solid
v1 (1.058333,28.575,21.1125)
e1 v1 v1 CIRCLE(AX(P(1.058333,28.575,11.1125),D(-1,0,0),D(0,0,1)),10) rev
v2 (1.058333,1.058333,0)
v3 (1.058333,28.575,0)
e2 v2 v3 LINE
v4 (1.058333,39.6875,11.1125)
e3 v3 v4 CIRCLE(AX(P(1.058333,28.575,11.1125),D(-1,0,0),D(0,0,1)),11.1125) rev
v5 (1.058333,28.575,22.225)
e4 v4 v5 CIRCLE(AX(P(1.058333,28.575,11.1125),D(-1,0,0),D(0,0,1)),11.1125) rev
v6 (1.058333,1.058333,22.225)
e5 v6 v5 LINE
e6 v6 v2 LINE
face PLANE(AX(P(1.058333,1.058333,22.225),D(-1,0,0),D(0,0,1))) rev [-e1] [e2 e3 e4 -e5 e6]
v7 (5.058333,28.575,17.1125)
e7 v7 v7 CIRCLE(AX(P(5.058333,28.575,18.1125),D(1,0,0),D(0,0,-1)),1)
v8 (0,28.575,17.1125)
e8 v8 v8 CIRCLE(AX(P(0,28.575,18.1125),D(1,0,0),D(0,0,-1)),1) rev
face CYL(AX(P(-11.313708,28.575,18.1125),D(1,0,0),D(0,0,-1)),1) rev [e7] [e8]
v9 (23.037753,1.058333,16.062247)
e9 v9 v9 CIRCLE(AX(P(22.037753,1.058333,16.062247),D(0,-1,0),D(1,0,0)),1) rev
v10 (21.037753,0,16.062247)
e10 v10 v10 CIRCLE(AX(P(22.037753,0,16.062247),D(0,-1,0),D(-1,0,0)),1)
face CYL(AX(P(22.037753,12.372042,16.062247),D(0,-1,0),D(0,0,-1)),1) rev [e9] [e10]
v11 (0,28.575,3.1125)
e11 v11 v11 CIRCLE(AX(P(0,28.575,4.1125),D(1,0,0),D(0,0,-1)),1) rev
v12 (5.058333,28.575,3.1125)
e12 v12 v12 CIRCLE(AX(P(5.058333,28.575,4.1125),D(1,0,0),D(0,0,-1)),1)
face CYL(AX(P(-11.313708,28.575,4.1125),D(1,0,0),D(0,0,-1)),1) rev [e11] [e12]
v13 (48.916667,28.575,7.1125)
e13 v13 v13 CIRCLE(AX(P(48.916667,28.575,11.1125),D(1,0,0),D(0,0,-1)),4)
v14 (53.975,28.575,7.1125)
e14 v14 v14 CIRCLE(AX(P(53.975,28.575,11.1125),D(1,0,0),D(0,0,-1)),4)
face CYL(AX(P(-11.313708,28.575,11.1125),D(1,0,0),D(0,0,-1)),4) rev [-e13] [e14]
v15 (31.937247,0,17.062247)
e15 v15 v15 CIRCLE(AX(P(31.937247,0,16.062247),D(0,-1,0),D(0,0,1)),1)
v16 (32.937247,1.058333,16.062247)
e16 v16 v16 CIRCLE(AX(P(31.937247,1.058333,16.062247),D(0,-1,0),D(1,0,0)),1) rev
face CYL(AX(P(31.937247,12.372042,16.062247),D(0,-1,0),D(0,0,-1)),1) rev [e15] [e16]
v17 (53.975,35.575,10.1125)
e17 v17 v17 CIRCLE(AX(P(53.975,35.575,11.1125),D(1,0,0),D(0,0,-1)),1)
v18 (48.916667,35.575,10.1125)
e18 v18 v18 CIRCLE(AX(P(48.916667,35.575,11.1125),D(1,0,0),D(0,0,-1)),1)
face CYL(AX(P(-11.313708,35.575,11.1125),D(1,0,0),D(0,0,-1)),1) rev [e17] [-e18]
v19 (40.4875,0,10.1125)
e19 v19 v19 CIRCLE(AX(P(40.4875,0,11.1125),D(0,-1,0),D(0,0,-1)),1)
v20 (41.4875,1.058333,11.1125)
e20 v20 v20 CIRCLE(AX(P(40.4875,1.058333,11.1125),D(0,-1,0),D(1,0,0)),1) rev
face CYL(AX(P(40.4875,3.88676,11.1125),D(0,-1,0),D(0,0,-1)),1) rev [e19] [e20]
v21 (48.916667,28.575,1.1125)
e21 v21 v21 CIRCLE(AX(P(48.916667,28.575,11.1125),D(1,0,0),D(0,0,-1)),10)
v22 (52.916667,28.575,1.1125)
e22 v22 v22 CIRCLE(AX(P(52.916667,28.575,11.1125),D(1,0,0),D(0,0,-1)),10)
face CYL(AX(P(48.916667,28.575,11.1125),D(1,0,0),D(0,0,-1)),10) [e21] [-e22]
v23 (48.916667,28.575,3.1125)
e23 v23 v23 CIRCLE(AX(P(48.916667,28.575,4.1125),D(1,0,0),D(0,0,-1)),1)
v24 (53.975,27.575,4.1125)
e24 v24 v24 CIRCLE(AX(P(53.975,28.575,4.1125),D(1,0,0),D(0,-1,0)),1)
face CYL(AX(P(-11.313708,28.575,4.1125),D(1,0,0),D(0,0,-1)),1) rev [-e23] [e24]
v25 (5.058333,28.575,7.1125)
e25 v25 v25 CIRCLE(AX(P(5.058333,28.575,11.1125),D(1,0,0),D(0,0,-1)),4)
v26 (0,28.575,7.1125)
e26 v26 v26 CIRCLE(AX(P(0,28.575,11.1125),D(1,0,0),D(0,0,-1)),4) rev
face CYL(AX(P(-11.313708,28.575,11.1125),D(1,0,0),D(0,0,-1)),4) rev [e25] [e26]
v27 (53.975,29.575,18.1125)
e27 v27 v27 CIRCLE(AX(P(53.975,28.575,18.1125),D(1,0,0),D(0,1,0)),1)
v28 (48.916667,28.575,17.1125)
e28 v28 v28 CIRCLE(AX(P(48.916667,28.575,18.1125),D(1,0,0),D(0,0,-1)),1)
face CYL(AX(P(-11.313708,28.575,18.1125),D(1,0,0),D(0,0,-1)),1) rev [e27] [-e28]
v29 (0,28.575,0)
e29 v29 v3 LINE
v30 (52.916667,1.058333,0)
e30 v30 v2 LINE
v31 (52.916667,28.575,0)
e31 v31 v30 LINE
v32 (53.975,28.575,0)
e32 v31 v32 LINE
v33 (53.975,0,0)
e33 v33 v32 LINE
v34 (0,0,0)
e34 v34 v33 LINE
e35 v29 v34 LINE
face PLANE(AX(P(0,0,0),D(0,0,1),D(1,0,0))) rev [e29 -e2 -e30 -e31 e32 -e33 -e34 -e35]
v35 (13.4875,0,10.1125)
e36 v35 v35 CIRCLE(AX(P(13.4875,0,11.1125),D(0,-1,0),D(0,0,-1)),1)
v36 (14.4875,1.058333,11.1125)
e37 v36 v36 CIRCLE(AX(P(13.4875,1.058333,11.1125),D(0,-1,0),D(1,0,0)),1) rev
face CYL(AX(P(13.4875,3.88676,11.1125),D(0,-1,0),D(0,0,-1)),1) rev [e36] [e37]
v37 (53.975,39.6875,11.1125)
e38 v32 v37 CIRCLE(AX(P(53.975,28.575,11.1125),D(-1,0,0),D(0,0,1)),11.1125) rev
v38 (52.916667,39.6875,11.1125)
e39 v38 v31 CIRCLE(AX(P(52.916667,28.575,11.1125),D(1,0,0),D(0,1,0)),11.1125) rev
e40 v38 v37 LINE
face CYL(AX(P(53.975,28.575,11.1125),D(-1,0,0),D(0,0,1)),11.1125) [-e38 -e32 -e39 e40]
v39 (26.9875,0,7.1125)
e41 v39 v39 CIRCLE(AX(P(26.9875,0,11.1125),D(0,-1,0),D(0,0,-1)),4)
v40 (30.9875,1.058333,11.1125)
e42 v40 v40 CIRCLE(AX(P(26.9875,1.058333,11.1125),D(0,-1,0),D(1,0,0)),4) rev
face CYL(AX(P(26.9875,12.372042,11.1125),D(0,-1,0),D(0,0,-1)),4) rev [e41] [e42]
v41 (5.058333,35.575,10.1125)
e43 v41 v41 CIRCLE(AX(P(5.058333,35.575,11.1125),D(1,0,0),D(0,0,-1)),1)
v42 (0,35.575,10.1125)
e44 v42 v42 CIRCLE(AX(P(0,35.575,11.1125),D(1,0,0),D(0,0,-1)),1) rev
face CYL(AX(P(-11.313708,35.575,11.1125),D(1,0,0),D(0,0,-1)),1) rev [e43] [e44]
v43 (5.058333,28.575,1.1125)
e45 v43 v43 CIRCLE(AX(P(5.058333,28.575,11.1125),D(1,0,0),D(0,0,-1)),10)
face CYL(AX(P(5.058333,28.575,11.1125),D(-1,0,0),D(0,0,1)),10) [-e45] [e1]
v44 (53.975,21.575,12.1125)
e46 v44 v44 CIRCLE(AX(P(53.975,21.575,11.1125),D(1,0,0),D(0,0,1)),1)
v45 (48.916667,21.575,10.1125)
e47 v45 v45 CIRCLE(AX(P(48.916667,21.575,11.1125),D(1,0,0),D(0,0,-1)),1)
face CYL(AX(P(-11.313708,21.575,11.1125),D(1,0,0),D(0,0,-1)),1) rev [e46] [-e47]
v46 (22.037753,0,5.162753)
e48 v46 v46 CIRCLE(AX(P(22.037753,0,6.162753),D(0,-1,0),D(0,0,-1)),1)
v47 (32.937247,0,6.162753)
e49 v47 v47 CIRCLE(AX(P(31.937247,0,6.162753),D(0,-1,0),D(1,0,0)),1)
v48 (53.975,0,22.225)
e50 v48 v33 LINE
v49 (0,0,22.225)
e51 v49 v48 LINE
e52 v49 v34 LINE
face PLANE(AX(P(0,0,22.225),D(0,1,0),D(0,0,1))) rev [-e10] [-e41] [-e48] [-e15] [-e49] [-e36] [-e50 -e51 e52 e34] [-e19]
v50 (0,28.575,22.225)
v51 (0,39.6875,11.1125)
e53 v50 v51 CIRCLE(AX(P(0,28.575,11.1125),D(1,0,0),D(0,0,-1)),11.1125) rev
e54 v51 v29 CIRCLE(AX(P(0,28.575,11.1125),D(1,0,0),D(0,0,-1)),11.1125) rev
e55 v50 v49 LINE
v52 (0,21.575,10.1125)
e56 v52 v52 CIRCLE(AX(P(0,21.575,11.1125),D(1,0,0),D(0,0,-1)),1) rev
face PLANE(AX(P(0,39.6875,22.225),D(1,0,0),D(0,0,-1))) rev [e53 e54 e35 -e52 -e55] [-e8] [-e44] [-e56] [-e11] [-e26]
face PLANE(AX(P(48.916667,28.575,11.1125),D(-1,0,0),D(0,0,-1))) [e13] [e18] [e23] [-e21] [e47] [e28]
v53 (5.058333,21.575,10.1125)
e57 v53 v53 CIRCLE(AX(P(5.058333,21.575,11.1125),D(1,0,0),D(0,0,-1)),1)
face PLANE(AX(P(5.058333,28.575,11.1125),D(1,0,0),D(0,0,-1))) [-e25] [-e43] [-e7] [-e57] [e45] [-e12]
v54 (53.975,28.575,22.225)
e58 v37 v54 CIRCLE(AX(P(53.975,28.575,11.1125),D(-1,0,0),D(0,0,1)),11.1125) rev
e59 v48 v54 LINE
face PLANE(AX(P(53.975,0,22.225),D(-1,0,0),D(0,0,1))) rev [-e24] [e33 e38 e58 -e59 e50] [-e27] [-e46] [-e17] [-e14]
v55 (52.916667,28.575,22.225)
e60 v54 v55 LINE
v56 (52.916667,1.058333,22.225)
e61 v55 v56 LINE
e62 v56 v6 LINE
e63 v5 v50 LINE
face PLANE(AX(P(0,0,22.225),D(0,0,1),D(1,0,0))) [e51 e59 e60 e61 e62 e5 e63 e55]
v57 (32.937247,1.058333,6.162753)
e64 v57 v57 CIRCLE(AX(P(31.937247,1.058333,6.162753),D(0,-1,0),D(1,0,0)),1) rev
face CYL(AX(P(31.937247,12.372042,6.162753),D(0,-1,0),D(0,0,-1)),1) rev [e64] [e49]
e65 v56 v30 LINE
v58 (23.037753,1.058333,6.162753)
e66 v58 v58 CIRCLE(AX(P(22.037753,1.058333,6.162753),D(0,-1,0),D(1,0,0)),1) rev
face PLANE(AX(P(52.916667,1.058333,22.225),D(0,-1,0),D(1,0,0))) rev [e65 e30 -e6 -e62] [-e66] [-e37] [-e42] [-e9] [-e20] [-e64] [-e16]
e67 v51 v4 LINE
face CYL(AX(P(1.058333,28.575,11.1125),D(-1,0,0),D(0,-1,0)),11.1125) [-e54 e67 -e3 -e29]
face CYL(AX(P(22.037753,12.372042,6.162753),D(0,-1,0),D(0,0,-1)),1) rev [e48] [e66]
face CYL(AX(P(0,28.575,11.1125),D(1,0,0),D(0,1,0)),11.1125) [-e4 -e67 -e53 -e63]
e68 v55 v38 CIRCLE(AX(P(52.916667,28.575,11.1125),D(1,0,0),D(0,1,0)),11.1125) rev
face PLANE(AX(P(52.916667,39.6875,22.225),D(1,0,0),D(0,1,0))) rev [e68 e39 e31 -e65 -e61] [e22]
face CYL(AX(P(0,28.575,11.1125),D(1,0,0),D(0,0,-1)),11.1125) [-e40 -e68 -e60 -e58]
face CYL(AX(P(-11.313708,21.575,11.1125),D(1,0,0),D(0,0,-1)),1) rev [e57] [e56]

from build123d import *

# Parameters (mm, degrees)
BOSS_EXTRUDE1_DEPTH = 22.225
FILLET1_R           = 11.1125
CUT_EXTRUDE1_REACH  = 72.586
SKETCH4_R           = 4
SKETCH4_R_2         = 1
CIRPATTERN1_COUNT   = 4
SKETCH5_R           = 4
SKETCH5_R_2         = 1
CUT_EXTRUDE2_DEPTH  = 1.058333333
CIRPATTERN2_COUNT   = 4
SKETCH6_R           = 1
CUT_EXTRUDE3_DEPTH  = 1.058333333
BOSS_EXTRUDE2_START = 4
SKETCH7_R           = 10
SKETCH7_R_2         = 1
SKETCH7_R_3         = 4
BOSS_EXTRUDE2_DEPTH = 4


with BuildPart() as part:
    # Sketch2 → Boss-Extrude1 (new body)
    with BuildSketch(Plane.XY):
        Polygon((0, 39.6875), (0, 0), (53.975, 0), (53.975, 39.6875), (52.916666667, 39.6875), (52.916666667, 1.058333333), (1.058333333, 1.058333333), (1.058333333, 39.6875), align=None)
    extrude(amount=BOSS_EXTRUDE1_DEPTH)

    # Fillet1
    fillet1_edges = [part.edges().sort_by_distance(p)[0] for p in [
        (0.529166667, 39.6875, 0),
        (0.529166667, 39.6875, 22.225),
        (53.445833333, 39.6875, 0),
        (53.445833333, 39.6875, 22.225),
    ]]
    fillet(fillet1_edges, radius=FILLET1_R - 0.0001)  # a hair under: the kernel refuses the full size

    # Cut-Extrude1: up to this face of the body (flat: up to its plane)
    cut_extrude1_end = Plane(part.part.faces().sort_by_distance((0, 18.733844913, 11.1125))[0])
    # Sketch4 → Cut-Extrude1 (cut, up to the picked face)
    with BuildSketch(Plane(origin=(53.975, 0, 0), x_dir=(0, 0, -1), z_dir=(1, 0, 0)), mode=Mode.PRIVATE) as cut_extrude1_sk1:
        with Locations((-11.1125, 28.575)):
            Circle(SKETCH4_R)
    cut_extrude1_tool1 = split(extrude(cut_extrude1_sk1.sketch, amount=-CUT_EXTRUDE1_REACH, mode=Mode.PRIVATE), bisect_by=cut_extrude1_end, keep=Keep.BOTH, mode=Mode.PRIVATE)
    # Sketch4 → Cut-Extrude1 (cut, up to the picked face)
    with BuildSketch(Plane(origin=(53.975, 0, 0), x_dir=(0, 0, -1), z_dir=(1, 0, 0)), mode=Mode.PRIVATE) as cut_extrude1_sk2:
        with Locations((-11.1125, 35.575)):
            Circle(SKETCH4_R_2)
    cut_extrude1_tool2 = split(extrude(cut_extrude1_sk2.sketch, amount=-CUT_EXTRUDE1_REACH, mode=Mode.PRIVATE), bisect_by=cut_extrude1_end, keep=Keep.BOTH, mode=Mode.PRIVATE)
    cut_extrude1_1 = cut_extrude1_tool1.solids().sort_by(Axis((53.975, 28.575, 11.1125), (-1, 0, 0)))[0]
    add(cut_extrude1_1, mode=Mode.SUBTRACT)
    cut_extrude1_2 = cut_extrude1_tool2.solids().sort_by(Axis((53.975, 35.575, 11.1125), (-1, 0, 0)))[0]
    add(cut_extrude1_2, mode=Mode.SUBTRACT)
    cut_extrude1 = cut_extrude1_1 + cut_extrude1_2  # Cut-Extrude1 as one shape, for the pattern or mirror that repeats it

    # CirPattern1: Cut-Extrude1 ×4 about axis
    cirpattern1_axis = Axis((0, 28.575, 11.1125), (1, 0, 0))
    for i in range(1, CIRPATTERN1_COUNT):
        add(cut_extrude1.rotate(cirpattern1_axis, i * 360 / CIRPATTERN1_COUNT), mode=Mode.SUBTRACT)

    # Sketch5 → Cut-Extrude2 (cut)
    with BuildSketch(Plane.XZ):
        with Locations(Location((26.9875, 11.1125, 0), (0, 0, 270))):
            Circle(SKETCH5_R)
        with Locations(Location((22.037752532, 6.162752532, 0), (0, 0, 270))):
            Circle(SKETCH5_R_2)
    cut_extrude2 = extrude(amount=-CUT_EXTRUDE2_DEPTH, mode=Mode.SUBTRACT)

    # CirPattern2: Cut-Extrude2 ×4 about axis
    cirpattern2_axis = Axis((26.9875, 0, 11.1125), (0, 1, 0))
    for i in range(1, CIRPATTERN2_COUNT):
        add(cut_extrude2.rotate(cirpattern2_axis, i * 360 / CIRPATTERN2_COUNT), mode=Mode.SUBTRACT)

    # Sketch6 → Cut-Extrude3 (cut)
    with BuildSketch(Plane.XZ):
        with Locations(Location((13.4875, 11.1125, 0), (0, 0, 270))):
            Circle(SKETCH6_R)
        with Locations(Location((40.4875, 11.1125, 0), (0, 0, 270))):
            Circle(SKETCH6_R)
    extrude(amount=-CUT_EXTRUDE3_DEPTH, mode=Mode.SUBTRACT)

    # Sketch7 → Boss-Extrude2 (add)
    with BuildSketch(Plane(origin=(1.058333333, 0, 0), x_dir=(0, 0, -1), z_dir=(1, 0, 0)).offset(BOSS_EXTRUDE2_START)):
        with Locations(Location((-11.1125, 28.575, 0), (0, 0, 180))):
            Circle(SKETCH7_R)
        with Locations((-18.1125, 28.575)):
            Circle(SKETCH7_R_2, mode=Mode.SUBTRACT)
        with Locations((-11.1125, 21.575)):
            Circle(SKETCH7_R_2, mode=Mode.SUBTRACT)
        with Locations((-4.1125, 28.575)):
            Circle(SKETCH7_R_2, mode=Mode.SUBTRACT)
        with Locations((-11.1125, 35.575)):
            Circle(SKETCH7_R_2, mode=Mode.SUBTRACT)
        with Locations((-11.1125, 28.575)):
            Circle(SKETCH7_R_3, mode=Mode.SUBTRACT)
    boss_extrude2 = extrude(amount=-BOSS_EXTRUDE2_DEPTH)

    # Mirror1: Boss-Extrude2 across plane
    add(boss_extrude2.mirror(Plane.ZY.offset(-26.9875)))


solid = part.part
